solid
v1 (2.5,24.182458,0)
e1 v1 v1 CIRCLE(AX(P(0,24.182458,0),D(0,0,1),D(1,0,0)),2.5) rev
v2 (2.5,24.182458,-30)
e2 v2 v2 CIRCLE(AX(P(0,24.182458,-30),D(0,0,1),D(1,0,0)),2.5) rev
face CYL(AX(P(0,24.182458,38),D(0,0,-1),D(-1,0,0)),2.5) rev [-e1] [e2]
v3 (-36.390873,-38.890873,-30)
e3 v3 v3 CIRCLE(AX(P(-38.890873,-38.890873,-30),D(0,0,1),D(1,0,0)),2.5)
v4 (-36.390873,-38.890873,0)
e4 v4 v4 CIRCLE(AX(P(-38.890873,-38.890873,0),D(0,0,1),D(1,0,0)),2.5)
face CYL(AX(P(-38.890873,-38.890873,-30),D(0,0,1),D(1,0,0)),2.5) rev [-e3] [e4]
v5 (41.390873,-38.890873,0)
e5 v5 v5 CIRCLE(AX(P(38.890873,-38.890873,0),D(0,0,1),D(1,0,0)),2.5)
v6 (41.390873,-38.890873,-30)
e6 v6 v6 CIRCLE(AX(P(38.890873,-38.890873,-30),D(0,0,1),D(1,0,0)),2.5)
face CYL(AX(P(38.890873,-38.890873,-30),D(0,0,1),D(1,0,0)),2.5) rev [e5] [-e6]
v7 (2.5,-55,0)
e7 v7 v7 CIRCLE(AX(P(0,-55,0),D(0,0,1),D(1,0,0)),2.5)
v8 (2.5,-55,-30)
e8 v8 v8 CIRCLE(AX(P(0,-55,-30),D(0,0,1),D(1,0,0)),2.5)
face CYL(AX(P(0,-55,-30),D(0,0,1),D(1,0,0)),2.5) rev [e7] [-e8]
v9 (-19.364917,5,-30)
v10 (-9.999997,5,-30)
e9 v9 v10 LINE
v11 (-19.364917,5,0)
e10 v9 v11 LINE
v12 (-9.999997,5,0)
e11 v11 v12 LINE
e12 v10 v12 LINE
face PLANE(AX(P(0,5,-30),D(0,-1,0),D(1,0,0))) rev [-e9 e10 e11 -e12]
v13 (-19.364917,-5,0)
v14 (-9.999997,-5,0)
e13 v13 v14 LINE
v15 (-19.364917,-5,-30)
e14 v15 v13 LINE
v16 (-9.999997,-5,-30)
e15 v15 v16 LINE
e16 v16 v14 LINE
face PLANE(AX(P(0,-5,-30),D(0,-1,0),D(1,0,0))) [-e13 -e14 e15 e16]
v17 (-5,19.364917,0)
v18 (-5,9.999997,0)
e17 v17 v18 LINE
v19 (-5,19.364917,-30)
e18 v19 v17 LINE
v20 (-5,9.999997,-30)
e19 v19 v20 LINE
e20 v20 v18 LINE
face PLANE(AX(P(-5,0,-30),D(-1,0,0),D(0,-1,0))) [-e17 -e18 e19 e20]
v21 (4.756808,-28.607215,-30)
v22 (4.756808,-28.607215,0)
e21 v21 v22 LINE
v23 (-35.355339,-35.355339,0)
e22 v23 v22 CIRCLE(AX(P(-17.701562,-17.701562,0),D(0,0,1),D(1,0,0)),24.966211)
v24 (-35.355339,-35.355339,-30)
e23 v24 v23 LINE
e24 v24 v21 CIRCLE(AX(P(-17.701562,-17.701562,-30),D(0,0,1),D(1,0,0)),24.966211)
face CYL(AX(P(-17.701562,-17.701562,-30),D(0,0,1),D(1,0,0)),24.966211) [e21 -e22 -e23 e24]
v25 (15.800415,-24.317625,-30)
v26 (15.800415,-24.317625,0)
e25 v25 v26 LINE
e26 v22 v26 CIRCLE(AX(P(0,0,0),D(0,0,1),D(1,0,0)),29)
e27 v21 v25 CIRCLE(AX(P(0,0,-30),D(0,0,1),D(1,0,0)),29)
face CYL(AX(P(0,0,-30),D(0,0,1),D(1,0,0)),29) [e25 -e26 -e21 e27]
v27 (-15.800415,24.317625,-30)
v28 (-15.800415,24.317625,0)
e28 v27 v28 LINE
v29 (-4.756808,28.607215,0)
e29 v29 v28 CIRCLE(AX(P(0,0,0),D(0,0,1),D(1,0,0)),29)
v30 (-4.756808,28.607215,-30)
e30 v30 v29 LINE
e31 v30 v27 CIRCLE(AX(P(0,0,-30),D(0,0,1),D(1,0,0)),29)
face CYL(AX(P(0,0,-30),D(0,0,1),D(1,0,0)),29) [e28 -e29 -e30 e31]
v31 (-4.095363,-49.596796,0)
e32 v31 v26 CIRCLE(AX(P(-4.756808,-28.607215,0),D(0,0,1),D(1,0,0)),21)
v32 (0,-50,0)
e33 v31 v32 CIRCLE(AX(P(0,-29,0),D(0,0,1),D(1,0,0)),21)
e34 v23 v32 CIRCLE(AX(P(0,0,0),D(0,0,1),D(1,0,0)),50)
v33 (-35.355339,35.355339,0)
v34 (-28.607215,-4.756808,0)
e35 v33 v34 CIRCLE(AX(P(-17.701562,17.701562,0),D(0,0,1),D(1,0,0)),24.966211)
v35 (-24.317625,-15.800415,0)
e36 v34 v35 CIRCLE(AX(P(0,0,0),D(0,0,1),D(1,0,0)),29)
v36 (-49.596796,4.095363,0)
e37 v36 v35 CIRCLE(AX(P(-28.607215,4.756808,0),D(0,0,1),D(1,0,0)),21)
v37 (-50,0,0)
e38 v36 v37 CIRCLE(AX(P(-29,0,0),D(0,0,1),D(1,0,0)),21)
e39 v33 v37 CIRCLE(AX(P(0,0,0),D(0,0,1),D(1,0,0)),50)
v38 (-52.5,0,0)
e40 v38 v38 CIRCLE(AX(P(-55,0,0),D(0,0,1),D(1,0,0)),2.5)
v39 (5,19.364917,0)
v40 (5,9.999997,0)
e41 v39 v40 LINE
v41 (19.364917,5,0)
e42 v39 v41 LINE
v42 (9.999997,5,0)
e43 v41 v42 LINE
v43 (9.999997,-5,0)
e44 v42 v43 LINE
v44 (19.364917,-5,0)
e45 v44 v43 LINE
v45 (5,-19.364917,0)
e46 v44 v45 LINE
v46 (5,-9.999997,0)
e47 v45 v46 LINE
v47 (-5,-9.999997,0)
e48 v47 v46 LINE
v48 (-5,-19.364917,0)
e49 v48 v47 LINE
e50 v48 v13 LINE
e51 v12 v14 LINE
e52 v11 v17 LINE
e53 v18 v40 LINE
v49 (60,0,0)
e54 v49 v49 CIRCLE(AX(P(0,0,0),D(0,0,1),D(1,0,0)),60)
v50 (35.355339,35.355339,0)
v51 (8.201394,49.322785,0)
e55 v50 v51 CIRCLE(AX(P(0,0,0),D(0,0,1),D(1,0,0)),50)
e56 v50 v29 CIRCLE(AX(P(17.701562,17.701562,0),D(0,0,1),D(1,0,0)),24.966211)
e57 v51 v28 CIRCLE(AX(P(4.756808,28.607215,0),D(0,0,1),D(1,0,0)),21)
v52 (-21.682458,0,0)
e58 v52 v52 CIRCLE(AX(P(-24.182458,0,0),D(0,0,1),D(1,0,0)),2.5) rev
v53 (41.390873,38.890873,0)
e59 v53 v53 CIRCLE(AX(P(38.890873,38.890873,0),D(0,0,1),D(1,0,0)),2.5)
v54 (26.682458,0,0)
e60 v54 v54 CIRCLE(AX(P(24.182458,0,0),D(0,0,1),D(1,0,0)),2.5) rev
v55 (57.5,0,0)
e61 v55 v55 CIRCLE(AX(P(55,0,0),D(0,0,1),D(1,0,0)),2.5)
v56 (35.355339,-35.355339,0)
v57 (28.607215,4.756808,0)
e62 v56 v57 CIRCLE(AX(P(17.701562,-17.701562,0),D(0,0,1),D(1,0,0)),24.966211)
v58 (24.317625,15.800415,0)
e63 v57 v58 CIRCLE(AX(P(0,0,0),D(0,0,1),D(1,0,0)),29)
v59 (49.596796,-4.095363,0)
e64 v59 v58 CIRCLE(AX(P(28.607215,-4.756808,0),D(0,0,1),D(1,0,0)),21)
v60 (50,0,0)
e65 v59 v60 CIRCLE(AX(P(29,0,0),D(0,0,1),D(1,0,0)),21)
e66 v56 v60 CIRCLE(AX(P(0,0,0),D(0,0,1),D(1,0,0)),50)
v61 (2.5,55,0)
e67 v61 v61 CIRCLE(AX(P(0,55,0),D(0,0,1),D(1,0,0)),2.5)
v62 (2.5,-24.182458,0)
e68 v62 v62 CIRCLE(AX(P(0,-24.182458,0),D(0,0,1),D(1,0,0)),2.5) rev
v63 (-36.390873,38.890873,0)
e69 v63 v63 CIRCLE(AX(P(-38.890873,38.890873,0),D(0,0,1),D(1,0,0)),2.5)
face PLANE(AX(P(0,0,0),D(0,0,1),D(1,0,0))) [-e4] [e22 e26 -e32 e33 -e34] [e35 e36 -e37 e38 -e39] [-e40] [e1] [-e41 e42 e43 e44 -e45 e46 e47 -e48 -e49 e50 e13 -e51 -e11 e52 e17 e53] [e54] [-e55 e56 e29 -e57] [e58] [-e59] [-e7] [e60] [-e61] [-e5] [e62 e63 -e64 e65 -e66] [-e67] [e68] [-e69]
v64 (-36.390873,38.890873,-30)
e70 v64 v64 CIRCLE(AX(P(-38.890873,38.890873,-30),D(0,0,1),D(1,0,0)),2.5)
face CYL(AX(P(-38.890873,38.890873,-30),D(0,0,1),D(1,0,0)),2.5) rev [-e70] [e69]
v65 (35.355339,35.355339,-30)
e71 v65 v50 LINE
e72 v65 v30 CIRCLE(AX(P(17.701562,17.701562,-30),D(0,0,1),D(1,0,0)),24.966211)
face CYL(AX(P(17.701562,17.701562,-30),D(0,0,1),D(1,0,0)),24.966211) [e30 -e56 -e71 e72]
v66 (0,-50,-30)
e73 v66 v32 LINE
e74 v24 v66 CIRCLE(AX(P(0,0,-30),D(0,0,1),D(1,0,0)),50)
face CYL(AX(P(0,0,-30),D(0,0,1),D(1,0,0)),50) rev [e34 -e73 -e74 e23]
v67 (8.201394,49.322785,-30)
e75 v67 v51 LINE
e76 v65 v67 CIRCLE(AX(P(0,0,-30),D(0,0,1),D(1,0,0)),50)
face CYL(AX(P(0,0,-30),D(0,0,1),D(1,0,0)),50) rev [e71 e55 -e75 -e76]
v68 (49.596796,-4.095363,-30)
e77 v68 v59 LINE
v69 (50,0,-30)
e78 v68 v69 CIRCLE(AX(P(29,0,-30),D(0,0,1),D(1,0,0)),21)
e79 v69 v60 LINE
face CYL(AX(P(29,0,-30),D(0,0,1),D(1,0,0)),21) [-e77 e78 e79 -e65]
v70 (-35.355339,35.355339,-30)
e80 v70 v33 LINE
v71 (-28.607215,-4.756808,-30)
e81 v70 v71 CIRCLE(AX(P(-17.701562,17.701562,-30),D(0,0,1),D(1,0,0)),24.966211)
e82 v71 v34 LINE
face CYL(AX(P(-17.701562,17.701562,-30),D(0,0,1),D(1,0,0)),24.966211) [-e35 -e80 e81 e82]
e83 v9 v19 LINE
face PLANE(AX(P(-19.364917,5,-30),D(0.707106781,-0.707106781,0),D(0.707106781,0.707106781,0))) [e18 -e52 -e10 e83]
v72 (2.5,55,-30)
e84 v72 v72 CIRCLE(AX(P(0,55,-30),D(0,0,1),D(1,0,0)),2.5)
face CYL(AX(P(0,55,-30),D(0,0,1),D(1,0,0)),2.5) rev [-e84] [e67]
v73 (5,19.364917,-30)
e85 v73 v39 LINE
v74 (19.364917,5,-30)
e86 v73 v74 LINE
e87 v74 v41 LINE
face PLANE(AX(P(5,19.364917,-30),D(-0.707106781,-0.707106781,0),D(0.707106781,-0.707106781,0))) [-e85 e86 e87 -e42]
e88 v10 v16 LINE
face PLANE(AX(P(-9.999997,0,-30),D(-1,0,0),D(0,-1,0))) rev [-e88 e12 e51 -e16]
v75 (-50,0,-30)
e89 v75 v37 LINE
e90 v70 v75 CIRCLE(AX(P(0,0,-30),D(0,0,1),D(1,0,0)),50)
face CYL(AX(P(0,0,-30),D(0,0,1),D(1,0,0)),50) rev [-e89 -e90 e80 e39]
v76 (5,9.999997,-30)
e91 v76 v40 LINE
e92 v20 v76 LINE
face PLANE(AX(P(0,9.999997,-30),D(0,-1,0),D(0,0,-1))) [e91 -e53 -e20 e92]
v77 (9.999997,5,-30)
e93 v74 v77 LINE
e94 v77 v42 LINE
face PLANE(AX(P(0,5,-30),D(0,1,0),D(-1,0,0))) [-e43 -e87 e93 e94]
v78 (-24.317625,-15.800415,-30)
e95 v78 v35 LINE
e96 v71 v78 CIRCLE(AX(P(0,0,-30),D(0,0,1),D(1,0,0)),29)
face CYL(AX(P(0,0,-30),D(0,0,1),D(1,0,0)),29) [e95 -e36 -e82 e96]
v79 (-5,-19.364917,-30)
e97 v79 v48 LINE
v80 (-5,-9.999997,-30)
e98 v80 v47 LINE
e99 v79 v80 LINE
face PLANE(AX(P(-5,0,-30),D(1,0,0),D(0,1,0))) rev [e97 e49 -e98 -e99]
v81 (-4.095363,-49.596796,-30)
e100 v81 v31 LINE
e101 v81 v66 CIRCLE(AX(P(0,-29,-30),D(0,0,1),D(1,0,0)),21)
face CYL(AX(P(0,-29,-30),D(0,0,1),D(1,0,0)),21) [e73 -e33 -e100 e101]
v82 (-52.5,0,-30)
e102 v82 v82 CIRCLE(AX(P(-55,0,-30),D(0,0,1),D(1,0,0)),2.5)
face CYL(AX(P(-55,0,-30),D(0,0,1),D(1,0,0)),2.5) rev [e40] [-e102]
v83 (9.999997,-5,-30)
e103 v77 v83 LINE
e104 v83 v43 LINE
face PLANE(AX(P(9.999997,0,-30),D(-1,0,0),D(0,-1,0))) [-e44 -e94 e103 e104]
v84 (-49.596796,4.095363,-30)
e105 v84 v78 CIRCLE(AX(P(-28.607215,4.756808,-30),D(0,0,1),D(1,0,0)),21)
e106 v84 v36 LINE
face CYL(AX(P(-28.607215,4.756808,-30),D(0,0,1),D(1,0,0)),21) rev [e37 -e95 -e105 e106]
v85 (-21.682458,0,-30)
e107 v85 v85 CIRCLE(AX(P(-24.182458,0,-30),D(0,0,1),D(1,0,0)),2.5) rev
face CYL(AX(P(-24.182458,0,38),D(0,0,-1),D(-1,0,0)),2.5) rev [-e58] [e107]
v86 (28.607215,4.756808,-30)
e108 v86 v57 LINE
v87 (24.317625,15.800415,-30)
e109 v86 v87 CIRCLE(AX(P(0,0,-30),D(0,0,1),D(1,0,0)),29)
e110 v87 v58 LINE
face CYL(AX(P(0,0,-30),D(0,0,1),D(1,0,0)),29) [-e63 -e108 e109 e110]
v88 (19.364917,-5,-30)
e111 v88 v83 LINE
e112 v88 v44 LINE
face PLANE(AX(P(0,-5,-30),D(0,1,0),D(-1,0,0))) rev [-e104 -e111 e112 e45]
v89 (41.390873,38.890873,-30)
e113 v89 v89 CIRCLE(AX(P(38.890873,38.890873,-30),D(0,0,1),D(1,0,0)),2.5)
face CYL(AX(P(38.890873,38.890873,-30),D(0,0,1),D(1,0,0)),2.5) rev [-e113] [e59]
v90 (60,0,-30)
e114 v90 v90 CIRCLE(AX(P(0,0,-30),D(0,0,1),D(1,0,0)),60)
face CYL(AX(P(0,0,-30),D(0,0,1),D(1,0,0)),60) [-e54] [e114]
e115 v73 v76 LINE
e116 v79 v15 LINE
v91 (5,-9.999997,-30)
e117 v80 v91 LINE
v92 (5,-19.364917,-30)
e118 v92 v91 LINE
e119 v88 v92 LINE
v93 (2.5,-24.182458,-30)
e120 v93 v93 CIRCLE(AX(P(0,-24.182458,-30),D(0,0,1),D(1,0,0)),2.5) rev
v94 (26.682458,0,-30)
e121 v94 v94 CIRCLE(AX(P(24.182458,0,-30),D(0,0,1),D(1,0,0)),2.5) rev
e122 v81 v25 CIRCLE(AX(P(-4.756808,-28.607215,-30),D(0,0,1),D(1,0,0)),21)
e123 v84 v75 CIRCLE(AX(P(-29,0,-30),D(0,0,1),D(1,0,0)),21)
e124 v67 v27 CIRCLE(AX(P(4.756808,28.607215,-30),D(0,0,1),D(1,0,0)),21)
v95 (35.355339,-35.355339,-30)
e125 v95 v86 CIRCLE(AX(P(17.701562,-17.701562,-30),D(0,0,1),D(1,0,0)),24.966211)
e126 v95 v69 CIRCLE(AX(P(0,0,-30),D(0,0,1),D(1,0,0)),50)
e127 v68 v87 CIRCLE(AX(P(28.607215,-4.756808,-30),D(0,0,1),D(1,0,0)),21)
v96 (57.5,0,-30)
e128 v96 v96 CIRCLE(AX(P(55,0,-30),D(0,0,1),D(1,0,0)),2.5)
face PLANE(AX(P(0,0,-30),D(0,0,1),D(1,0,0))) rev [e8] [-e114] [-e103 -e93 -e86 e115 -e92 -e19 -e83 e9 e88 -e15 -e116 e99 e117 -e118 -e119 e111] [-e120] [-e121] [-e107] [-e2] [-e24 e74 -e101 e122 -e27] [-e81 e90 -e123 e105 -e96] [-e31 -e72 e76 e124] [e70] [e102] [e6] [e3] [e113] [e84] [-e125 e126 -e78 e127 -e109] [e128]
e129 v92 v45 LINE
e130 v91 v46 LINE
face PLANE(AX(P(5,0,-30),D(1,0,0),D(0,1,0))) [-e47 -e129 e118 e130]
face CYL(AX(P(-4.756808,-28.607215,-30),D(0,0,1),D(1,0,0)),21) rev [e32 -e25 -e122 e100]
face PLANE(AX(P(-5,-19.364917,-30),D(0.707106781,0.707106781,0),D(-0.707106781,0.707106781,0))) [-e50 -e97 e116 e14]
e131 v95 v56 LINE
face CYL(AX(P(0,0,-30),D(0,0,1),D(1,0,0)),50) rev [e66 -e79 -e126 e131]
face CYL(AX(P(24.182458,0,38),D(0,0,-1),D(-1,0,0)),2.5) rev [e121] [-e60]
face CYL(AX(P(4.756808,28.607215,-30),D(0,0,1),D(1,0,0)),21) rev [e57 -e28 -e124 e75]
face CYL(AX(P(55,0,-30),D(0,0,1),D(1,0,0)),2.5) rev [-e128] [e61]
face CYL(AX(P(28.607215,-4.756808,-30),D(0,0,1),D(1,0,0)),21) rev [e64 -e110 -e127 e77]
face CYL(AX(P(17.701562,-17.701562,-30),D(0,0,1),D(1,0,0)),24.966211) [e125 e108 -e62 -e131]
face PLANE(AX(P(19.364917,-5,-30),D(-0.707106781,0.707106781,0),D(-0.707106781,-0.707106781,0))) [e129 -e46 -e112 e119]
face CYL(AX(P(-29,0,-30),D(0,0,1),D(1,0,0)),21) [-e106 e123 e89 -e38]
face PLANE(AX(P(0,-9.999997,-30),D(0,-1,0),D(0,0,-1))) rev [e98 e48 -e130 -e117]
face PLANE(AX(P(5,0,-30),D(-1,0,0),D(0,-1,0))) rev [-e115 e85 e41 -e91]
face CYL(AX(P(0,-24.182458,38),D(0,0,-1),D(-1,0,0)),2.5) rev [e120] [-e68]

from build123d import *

# Parameters (mm, degrees)
SKETCH6_R                 = 29
SKETCH6_R_2               = 20
INNER_RING_DEPTH          = 30
MOTOR_CONNECTOR_CUT_DEPTH = 30
M3_HOLES_DEPTH            = 38
M3_HOLES_DEPTH_BACK       = 100
SKETCH8_R                 = 2.5
MIDDLE_PATTERN_DEPTH      = 30
SKETCH9_R                 = 60
SKETCH9_R_2               = 50
SKETCH9_R_3               = 2.5
BOSS_EXTRUDE1_DEPTH       = 30
BOSS_EXTRUDE2_DEPTH       = 30


with BuildPart() as part:
    # Sketch6 → Inner Ring (new body)
    with BuildSketch(Plane.XY):
        Circle(SKETCH6_R)
        Circle(SKETCH6_R_2, mode=Mode.SUBTRACT)
    extrude(amount=-INNER_RING_DEPTH)

    # Sketch7 → Motor Connector Cut (add)
    with BuildSketch(Plane.XY):
        with BuildLine():
            Line((-9.999996731, -5), (-9.999996731, 5))
            Line((-9.999996731, 5), (-19.364916731, 5))
            ThreePointArc((-19.364916731, 5), (-20, 0), (-19.364916731, -5))
            Line((-19.364916731, -5), (-9.999996731, -5))
        make_face()
        with BuildLine():
            ThreePointArc((5, 19.364916731), (0, 20), (-5, 19.364916731))
            Line((-5, 19.364916731), (-5, 9.999996731))
            Line((-5, 9.999996731), (5, 9.999996731))
            Line((5, 9.999996731), (5, 19.364916731))
        make_face()
        with BuildLine():
            Line((-5, -9.999996731), (-5, -19.364916731))
            ThreePointArc((-5, -19.364916731), (0, -20), (5, -19.364916731))
            Line((5, -19.364916731), (5, -9.999996731))
            Line((5, -9.999996731), (-5, -9.999996731))
        make_face()
        with BuildLine():
            ThreePointArc((19.364916731, -5), (20, 0), (19.364916731, 5))
            Line((19.364916731, 5), (9.999996731, 5))
            Line((9.999996731, 5), (9.999996731, -5))
            Line((9.999996731, -5), (19.364916731, -5))
        make_face()
    extrude(amount=-MOTOR_CONNECTOR_CUT_DEPTH)

    # Sketch8 → M3 Holes (cut, two sides: drawn at the far end of the back side and taken through both)
    with BuildSketch(Plane.XY.offset(-M3_HOLES_DEPTH_BACK)):
        with Locations((0, 24.182458366)):
            Circle(SKETCH8_R)
        with Locations((24.182458366, 0)):
            Circle(SKETCH8_R)
        with Locations((0, -24.182458366)):
            Circle(SKETCH8_R)
        with Locations((-24.182458366, 0)):
            Circle(SKETCH8_R)
    extrude(amount=M3_HOLES_DEPTH + M3_HOLES_DEPTH_BACK, mode=Mode.SUBTRACT)

    # Sketch10 → Middle Pattern (add)
    with BuildSketch(Plane.XY):
        with BuildLine():
            ThreePointArc((28.607215414, 4.756808408), (26.539406056, -11.690163651), (15.800414568, -24.317625284))
            ThreePointArc((15.800414568, -24.317625284), (11.745224483, -41.595013937), (-4.095362954, -49.596795923))
            ThreePointArc((-4.095362954, -49.596795923), (-2.057581903, -49.898955876), (-2.31e-07, -50))
            ThreePointArc((-2.31e-07, -50), (19.134171511, -46.19397667), (35.355339059, -35.355339059))
            ThreePointArc((35.355339059, -35.355339059), (42.321804958, -13.559663633), (28.607215414, 4.756808408))
        make_face()
        with BuildLine():
            ThreePointArc((24.317625284, 15.800414568), (41.595013937, 11.745224483), (49.596795923, -4.095362954))
            ThreePointArc((49.596795923, -4.095362954), (49.898955887, -2.057581788), (50, 0))
            ThreePointArc((50, 0), (46.193976626, 19.134171618), (35.355339059, 35.355339059))
            ThreePointArc((35.355339059, 35.355339059), (13.559663633, 42.321804958), (-4.756808408, 28.607215414))
            ThreePointArc((-4.756808408, 28.607215414), (11.690163651, 26.539406056), (24.317625284, 15.800414568))
        make_face()
        with BuildLine():
            ThreePointArc((8.201394106, 49.322785148), (-15.267827902, 47.611904301), (-35.355339044, 35.355339075))
            ThreePointArc((-35.355339044, 35.355339075), (-42.32180496, 13.559663644), (-28.607215414, -4.756808408))
            ThreePointArc((-28.607215414, -4.756808408), (-26.539406056, 11.690163651), (-15.800414568, 24.317625284))
            ThreePointArc((-15.800414568, 24.317625284), (-10.393277189, 43.149392225), (8.201394106, 49.322785148))
        make_face()
        with BuildLine():
            ThreePointArc((4.756808408, -28.607215414), (-11.690163651, -26.539406056), (-24.317625284, -15.800414568))
            ThreePointArc((-24.317625284, -15.800414568), (-41.595013937, -11.745224483), (-49.596795923, 4.095362954))
            ThreePointArc((-49.596795923, 4.095362954), (-49.898955887, 2.057581788), (-50, 0))
            ThreePointArc((-50, 0), (-46.193976566, -19.134171762), (-35.355338839, -35.35533928))
            ThreePointArc((-35.355338839, -35.35533928), (-13.559663479, -42.321804932), (4.756808408, -28.607215414))
        make_face()
    extrude(amount=-MIDDLE_PATTERN_DEPTH)



with BuildPart() as body_2:
    # Sketch9 → Boss-Extrude1 (new body)
    with BuildSketch(Plane.XY):
        Circle(SKETCH9_R)
        Circle(SKETCH9_R_2, mode=Mode.SUBTRACT)
        with Locations((0, 55)):
            Circle(SKETCH9_R_3, mode=Mode.SUBTRACT)
        with Locations((-38.890872965, 38.890872965)):
            Circle(SKETCH9_R_3, mode=Mode.SUBTRACT)
        with Locations((-55, 0)):
            Circle(SKETCH9_R_3, mode=Mode.SUBTRACT)
        with Locations((-38.890872965, -38.890872965)):
            Circle(SKETCH9_R_3, mode=Mode.SUBTRACT)
        with Locations((0, -55)):
            Circle(SKETCH9_R_3, mode=Mode.SUBTRACT)
        with Locations((38.890872965, -38.890872965)):
            Circle(SKETCH9_R_3, mode=Mode.SUBTRACT)
        with Locations((55, 0)):
            Circle(SKETCH9_R_3, mode=Mode.SUBTRACT)
        with Locations((38.890872965, 38.890872965)):
            Circle(SKETCH9_R_3, mode=Mode.SUBTRACT)
    extrude(amount=-BOSS_EXTRUDE1_DEPTH)


with BuildPart() as part_1:
    add(part.part)

    add(body_2.part)  # Boss-Extrude2 merges body 2
    # Sketch11 → Boss-Extrude2 (add)
    with BuildSketch(Plane.XY):
        with BuildLine():
            Line((-19.364916731, 5), (-5, 19.364916731))
            ThreePointArc((-5, 19.364916731), (-14.142135624, 14.142135624), (-19.364916731, 5))
        make_face()
        with BuildLine():
            Line((5, 19.364916731), (19.364916731, 5))
            ThreePointArc((19.364916731, 5), (14.142135624, 14.142135624), (5, 19.364916731))
        make_face()
        with BuildLine():
            Line((19.364916731, -5), (5, -19.364916731))
            ThreePointArc((5, -19.364916731), (14.142135624, -14.142135624), (19.364916731, -5))
        make_face()
        with BuildLine():
            Line((-5, -19.364916731), (-19.364916731, -5))
            ThreePointArc((-19.364916731, -5), (-14.142135624, -14.142135624), (-5, -19.364916731))
        make_face()
    extrude(amount=-BOSS_EXTRUDE2_DEPTH)


solid = part_1.part
